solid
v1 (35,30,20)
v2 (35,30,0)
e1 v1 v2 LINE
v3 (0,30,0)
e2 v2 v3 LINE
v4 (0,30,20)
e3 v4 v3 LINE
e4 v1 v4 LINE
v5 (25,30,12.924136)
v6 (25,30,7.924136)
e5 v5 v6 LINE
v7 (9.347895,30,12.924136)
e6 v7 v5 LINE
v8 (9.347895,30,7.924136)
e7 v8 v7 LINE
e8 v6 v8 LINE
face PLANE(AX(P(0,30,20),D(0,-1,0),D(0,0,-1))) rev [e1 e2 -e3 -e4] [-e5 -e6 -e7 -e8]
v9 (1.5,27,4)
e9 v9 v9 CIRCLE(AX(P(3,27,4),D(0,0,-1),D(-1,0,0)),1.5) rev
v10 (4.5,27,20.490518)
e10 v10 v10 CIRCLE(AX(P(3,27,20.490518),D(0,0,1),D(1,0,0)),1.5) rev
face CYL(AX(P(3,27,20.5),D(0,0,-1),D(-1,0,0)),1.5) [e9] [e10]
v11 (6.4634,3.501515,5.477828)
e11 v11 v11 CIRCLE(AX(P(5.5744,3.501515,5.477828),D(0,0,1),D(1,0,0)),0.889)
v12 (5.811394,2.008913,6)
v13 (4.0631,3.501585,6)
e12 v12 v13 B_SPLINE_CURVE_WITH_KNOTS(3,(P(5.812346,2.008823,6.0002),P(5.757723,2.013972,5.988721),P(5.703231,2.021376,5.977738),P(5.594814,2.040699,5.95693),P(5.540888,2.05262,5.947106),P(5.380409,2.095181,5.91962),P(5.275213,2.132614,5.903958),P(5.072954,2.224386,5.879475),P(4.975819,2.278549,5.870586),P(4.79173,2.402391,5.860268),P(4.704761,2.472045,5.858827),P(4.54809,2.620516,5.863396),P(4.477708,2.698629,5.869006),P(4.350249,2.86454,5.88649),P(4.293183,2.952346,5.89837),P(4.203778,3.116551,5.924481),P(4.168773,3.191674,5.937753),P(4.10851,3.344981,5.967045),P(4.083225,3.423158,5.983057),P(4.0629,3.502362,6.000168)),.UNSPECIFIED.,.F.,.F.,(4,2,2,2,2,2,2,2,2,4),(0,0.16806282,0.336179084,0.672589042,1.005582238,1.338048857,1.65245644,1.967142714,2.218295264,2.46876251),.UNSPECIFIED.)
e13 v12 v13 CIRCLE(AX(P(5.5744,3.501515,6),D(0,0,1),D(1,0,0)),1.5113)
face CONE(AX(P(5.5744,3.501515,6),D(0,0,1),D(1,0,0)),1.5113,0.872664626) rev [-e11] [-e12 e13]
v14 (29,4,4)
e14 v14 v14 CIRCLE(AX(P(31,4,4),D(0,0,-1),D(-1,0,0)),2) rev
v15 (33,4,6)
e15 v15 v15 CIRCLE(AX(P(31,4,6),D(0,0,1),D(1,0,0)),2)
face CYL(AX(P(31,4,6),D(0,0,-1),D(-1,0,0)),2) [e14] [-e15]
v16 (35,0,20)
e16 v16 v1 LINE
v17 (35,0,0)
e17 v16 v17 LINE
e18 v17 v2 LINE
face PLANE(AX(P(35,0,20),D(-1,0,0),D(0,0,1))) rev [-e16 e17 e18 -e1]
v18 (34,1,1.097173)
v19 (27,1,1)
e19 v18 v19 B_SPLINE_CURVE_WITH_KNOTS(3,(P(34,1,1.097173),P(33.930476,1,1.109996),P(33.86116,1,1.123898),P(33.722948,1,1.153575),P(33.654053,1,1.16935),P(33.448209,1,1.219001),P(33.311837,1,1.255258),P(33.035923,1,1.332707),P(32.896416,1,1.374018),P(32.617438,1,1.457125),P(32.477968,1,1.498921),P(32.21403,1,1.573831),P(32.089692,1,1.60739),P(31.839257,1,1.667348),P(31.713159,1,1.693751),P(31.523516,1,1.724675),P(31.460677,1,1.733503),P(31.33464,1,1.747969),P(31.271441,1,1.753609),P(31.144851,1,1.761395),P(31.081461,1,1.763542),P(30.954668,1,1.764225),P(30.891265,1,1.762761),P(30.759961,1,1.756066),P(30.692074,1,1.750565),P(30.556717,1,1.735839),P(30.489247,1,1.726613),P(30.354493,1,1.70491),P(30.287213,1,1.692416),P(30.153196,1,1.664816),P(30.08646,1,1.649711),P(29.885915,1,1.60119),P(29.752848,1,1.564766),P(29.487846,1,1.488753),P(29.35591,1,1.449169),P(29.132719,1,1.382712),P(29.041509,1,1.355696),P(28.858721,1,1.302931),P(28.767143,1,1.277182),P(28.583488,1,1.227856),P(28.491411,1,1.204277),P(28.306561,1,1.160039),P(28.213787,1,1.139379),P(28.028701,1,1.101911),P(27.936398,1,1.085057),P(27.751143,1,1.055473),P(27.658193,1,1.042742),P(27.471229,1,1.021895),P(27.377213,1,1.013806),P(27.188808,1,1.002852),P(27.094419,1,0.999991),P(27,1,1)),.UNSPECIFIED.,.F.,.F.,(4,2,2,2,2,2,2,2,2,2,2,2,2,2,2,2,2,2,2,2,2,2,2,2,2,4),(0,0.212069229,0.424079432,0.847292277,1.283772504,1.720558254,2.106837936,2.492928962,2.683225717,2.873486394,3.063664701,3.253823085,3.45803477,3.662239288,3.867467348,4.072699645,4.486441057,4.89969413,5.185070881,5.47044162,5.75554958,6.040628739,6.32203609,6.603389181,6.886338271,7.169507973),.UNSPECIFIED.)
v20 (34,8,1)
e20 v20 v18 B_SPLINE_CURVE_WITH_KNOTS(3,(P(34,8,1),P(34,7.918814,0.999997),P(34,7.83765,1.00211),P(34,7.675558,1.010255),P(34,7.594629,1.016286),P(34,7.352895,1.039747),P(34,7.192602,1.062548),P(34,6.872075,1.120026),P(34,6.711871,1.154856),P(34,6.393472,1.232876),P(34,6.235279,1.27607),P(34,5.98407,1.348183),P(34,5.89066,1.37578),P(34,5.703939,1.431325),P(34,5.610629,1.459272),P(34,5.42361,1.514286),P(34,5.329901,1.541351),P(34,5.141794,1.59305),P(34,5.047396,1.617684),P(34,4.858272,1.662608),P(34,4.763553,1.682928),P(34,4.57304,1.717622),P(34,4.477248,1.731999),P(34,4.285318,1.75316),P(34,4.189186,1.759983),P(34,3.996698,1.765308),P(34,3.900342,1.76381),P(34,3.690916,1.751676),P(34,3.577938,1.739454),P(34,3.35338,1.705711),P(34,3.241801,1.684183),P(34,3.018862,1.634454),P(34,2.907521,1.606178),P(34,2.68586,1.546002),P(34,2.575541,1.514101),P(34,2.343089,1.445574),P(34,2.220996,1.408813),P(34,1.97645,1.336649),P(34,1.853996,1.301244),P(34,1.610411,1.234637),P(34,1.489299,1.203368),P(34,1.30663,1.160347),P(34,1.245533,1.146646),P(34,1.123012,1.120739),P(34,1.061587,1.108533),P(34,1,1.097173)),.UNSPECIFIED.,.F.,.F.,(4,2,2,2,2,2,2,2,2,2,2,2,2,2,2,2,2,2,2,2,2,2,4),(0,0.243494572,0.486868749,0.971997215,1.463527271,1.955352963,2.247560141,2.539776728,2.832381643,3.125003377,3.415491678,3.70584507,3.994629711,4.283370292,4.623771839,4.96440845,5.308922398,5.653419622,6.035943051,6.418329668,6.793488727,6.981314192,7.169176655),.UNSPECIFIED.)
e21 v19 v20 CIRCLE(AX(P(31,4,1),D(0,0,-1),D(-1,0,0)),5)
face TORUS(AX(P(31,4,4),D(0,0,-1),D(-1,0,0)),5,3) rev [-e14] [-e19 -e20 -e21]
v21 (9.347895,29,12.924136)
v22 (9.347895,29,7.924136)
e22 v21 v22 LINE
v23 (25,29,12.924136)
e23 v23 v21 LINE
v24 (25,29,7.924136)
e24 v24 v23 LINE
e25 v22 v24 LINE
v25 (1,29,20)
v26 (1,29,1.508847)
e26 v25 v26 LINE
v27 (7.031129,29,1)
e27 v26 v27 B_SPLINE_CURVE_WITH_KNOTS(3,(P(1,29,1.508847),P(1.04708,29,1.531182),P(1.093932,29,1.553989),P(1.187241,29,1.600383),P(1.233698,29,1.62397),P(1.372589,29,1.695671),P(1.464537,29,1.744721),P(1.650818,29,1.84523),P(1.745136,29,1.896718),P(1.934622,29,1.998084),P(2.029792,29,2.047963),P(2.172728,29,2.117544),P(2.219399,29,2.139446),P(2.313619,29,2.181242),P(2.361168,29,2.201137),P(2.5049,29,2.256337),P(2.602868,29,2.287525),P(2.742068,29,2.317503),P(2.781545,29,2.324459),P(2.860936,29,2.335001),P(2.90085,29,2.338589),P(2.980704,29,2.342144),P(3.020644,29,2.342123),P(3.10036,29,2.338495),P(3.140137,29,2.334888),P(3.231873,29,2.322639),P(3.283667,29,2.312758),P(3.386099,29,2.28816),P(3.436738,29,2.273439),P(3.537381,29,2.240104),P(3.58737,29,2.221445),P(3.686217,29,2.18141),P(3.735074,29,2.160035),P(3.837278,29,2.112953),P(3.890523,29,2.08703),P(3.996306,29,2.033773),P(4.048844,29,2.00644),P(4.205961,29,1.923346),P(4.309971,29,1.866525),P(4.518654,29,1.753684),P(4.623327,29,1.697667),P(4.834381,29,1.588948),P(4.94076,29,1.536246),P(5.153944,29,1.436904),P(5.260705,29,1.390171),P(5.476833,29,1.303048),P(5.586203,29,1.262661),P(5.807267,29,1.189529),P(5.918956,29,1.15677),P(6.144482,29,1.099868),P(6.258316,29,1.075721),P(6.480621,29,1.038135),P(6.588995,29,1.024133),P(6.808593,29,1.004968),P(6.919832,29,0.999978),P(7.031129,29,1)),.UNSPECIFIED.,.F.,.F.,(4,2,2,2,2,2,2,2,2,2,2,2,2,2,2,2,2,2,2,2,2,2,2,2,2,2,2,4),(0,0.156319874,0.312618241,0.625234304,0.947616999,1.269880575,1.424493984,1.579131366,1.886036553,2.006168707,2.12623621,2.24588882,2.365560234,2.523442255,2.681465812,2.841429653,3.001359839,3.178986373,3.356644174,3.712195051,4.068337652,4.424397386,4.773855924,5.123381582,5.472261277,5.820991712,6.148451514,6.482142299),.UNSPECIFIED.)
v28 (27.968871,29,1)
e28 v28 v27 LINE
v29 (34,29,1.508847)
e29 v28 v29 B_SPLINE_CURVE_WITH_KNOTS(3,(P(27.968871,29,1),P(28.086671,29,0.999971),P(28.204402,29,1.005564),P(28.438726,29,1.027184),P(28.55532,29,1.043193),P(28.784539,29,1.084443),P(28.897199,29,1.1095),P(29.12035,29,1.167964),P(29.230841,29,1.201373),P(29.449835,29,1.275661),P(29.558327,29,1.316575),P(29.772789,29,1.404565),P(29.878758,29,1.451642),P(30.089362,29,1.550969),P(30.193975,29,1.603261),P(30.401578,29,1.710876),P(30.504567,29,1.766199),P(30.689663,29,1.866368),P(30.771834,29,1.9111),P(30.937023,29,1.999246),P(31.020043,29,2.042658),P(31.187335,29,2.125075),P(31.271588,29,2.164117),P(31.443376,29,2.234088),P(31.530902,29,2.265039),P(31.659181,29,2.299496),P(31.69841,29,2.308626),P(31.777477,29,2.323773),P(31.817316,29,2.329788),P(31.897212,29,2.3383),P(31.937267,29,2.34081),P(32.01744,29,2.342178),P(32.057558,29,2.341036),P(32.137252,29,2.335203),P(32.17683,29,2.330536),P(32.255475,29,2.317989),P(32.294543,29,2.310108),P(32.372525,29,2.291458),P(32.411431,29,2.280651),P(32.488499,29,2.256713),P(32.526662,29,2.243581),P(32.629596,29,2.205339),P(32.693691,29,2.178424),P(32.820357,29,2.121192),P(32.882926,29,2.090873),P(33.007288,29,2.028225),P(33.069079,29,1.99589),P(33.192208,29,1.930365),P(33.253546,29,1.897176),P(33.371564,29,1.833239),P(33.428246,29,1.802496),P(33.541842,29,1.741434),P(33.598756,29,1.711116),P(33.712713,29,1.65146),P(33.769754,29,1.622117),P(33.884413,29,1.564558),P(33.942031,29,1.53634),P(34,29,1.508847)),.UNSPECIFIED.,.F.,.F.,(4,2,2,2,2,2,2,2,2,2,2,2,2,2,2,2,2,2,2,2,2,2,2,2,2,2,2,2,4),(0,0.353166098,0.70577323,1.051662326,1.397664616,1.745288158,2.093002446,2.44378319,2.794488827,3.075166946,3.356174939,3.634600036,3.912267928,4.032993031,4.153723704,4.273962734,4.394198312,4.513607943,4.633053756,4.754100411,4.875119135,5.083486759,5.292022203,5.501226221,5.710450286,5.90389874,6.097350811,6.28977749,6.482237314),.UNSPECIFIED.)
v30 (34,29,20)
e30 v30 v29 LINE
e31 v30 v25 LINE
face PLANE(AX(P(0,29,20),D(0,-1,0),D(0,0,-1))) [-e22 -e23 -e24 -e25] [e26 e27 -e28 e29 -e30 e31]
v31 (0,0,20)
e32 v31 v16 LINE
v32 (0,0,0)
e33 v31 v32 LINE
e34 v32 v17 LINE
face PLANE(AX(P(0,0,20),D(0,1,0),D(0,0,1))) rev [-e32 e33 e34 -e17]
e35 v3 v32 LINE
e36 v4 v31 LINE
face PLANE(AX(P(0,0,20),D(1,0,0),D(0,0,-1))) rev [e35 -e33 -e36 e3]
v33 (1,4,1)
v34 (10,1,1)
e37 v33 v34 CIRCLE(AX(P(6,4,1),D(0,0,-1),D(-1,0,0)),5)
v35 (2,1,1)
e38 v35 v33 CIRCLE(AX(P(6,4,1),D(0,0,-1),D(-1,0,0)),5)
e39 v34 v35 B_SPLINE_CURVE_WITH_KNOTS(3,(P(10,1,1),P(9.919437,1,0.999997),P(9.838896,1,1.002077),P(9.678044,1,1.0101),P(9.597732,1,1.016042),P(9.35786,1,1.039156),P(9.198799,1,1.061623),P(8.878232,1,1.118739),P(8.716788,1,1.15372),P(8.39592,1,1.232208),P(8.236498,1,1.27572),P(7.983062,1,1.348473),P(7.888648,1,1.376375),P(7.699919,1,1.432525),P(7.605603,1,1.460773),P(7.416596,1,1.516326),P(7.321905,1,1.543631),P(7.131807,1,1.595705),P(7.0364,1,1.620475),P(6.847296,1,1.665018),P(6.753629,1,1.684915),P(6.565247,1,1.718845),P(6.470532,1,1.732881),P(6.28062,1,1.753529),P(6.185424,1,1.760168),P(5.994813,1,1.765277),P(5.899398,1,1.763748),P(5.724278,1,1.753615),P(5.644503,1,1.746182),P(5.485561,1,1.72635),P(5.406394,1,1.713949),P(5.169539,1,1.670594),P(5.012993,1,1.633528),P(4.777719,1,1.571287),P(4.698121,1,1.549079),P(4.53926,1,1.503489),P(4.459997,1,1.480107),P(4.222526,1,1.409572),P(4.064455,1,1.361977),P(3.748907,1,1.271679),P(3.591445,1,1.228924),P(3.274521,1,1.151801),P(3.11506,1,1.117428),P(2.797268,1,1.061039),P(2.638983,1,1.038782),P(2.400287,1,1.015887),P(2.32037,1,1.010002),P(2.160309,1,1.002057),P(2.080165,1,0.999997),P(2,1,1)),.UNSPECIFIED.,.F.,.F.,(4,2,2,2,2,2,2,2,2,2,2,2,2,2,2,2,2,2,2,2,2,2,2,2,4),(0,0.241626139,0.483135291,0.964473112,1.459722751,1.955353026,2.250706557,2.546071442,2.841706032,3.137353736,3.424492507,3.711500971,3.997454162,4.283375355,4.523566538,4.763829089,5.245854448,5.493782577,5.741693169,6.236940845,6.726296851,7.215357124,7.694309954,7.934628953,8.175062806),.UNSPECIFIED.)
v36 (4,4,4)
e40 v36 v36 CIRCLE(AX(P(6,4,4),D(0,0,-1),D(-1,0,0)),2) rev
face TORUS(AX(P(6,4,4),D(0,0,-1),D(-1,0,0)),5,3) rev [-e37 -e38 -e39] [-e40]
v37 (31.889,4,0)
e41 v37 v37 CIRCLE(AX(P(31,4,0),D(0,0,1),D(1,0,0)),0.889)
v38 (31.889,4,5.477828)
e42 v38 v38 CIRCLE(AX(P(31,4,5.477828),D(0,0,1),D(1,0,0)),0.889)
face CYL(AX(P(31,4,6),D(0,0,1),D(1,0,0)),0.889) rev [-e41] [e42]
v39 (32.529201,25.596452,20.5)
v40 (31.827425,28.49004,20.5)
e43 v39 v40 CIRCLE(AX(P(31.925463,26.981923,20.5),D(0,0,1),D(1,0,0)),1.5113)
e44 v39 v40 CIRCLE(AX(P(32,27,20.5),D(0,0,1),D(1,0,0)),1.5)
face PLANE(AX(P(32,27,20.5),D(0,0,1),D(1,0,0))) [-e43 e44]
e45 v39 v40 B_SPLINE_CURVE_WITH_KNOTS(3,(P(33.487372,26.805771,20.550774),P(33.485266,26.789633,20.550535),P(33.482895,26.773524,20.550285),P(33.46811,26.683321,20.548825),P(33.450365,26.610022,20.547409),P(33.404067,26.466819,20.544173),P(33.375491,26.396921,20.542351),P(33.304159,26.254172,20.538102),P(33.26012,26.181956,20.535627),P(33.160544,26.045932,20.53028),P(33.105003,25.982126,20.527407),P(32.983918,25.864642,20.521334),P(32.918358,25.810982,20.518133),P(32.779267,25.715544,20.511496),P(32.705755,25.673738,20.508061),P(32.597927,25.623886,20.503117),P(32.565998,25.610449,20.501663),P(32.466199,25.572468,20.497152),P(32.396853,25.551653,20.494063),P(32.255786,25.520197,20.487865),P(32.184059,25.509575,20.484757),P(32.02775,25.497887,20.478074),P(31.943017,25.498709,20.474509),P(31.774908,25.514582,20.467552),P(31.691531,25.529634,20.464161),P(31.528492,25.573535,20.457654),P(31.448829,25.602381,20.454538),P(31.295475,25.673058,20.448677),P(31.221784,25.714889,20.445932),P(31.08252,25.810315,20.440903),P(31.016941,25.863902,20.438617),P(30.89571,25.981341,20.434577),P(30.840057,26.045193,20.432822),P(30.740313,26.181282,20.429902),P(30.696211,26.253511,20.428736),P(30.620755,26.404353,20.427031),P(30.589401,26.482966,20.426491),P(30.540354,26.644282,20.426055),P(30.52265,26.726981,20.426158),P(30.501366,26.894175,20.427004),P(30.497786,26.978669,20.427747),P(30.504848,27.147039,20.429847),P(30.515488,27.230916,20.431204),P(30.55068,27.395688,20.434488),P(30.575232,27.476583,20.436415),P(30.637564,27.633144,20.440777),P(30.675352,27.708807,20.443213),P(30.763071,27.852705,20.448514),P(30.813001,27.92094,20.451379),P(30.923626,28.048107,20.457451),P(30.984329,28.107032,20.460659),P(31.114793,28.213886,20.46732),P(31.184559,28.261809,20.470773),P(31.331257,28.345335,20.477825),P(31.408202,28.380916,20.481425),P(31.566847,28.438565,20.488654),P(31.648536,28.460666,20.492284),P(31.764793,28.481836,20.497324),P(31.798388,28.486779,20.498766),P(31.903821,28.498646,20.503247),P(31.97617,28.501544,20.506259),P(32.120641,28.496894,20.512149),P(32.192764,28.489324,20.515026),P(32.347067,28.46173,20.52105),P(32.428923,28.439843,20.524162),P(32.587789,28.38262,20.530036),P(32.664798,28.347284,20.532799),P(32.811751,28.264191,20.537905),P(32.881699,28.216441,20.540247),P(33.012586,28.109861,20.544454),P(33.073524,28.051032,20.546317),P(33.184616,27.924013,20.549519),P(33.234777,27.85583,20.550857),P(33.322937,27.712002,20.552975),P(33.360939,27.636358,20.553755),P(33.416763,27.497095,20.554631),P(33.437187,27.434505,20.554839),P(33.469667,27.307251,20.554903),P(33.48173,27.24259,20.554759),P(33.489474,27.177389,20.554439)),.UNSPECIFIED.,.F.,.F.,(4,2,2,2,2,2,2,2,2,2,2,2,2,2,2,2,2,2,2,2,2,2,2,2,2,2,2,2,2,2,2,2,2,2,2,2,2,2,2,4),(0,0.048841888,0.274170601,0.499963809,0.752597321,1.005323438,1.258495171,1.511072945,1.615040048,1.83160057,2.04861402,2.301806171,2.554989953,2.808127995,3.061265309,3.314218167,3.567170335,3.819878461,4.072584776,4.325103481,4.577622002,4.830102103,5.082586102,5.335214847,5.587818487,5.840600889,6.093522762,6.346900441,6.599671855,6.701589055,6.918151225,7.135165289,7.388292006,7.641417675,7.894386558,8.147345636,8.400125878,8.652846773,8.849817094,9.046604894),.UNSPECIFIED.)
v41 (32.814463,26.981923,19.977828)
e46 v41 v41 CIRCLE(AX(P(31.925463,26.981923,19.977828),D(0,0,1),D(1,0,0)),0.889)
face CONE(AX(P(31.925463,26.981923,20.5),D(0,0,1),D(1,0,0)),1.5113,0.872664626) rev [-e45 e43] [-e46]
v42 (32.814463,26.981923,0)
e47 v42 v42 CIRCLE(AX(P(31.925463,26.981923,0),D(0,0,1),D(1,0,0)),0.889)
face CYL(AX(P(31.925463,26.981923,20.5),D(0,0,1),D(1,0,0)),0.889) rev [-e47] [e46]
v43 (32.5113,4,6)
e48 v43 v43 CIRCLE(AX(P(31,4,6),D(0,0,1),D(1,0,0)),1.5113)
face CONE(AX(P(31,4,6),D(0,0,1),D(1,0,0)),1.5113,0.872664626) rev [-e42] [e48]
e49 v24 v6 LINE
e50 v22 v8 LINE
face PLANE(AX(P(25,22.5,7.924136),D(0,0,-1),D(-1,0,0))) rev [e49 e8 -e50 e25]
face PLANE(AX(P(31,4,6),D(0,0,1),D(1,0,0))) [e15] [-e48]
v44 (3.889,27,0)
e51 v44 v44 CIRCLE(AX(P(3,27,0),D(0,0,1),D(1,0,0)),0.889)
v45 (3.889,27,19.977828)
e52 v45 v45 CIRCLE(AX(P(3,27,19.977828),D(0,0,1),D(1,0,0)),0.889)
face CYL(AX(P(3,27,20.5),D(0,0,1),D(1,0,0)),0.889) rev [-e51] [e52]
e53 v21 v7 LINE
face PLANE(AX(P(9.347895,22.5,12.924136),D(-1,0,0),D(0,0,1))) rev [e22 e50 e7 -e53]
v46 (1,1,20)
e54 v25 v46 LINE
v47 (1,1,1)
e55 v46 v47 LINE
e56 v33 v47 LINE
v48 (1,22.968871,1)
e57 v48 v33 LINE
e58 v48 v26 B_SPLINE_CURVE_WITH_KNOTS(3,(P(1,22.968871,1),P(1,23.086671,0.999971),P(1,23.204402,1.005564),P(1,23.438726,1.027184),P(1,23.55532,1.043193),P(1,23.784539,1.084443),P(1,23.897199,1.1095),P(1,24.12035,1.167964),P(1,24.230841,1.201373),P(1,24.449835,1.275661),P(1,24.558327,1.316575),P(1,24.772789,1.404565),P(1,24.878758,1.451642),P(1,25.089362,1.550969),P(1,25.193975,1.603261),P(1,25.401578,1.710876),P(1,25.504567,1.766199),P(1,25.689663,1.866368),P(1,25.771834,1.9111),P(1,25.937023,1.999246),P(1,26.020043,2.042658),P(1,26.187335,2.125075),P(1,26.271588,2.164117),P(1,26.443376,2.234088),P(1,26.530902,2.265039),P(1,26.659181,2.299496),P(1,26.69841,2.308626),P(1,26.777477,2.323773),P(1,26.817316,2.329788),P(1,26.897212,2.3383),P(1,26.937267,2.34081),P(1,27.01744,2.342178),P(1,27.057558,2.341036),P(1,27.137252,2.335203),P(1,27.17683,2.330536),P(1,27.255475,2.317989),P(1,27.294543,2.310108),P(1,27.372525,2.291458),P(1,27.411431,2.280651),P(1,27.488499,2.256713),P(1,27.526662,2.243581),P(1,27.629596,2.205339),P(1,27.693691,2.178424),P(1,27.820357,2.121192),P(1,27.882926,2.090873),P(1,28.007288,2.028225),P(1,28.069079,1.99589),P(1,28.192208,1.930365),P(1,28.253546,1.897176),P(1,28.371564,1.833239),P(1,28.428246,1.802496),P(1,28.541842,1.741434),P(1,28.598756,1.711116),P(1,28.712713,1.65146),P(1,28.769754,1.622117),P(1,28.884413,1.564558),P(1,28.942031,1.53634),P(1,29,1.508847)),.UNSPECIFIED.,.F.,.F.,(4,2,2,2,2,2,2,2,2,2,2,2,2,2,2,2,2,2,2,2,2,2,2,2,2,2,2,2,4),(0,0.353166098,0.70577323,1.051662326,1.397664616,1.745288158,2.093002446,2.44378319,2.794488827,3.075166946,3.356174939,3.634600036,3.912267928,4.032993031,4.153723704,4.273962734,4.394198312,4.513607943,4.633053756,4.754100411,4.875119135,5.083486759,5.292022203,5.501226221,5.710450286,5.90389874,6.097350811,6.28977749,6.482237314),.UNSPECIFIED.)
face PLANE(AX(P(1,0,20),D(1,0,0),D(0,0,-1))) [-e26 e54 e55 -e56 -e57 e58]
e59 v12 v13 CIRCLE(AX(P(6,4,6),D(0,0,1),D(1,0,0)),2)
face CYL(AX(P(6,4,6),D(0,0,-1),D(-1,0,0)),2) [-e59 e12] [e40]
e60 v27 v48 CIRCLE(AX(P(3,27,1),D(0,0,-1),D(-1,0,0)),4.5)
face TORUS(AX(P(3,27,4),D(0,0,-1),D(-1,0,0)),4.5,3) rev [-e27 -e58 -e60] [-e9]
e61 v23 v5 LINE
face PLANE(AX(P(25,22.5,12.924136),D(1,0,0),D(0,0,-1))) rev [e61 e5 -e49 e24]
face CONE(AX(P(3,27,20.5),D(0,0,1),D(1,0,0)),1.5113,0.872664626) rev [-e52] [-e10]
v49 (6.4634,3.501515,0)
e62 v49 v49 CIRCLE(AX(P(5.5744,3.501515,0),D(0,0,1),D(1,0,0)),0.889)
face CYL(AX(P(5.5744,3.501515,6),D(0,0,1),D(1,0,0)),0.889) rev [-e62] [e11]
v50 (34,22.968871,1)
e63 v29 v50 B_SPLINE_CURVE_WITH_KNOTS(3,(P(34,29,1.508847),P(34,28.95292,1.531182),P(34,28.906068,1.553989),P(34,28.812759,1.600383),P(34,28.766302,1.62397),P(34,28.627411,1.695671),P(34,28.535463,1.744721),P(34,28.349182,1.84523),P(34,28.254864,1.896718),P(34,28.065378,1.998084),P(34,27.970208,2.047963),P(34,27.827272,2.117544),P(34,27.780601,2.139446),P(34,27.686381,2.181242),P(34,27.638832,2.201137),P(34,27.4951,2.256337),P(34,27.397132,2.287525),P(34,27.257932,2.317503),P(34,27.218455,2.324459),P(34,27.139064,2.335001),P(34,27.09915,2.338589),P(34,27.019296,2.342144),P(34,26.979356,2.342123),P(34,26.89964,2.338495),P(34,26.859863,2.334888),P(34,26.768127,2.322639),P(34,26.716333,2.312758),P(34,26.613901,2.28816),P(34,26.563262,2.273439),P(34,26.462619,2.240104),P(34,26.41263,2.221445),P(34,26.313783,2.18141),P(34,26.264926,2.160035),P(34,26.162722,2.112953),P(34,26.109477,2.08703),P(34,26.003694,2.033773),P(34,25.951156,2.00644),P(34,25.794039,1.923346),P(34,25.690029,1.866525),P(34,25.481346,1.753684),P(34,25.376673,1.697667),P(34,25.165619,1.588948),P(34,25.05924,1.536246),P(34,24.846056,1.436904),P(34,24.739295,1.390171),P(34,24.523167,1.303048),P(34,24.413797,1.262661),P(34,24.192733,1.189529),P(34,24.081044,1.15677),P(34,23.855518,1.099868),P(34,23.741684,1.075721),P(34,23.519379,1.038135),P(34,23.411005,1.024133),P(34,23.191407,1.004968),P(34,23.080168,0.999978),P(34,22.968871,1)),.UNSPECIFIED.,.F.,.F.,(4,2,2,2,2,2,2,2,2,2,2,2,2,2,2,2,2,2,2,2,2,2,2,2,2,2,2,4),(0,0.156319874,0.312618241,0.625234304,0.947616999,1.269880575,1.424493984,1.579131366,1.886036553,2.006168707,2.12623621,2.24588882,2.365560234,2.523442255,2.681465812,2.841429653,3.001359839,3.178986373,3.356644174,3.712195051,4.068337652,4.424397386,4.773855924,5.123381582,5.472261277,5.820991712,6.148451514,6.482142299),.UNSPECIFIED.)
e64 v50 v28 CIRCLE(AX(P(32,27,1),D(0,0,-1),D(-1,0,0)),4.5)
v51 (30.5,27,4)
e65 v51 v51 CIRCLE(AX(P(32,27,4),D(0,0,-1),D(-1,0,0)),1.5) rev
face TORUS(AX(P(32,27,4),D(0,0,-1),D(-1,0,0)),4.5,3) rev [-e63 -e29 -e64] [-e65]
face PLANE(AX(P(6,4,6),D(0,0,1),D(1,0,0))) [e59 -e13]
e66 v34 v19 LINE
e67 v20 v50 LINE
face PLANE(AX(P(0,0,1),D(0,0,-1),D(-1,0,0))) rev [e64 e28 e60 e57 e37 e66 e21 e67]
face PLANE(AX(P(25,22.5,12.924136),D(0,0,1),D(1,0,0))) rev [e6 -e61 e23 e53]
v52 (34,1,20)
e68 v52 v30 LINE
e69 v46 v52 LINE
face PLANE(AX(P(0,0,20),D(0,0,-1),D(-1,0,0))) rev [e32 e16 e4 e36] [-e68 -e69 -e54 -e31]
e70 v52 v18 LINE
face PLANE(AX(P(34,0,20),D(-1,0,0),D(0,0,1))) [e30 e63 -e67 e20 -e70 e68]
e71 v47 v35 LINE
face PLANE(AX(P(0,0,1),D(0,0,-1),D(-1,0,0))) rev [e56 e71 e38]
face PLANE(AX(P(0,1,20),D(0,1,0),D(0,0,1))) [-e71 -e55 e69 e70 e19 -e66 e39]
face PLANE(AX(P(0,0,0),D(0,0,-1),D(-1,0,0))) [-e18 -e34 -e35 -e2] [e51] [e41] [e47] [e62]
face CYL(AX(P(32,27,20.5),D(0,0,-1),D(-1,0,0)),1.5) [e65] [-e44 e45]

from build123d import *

# Parameters (mm, degrees)
SKETCH1_W                                         = 35
SKETCH1_H                                         = 30
BOSS_EXTRUDE1_DEPTH                               = 20
SHELL1_T                                          = -1
SKETCH6_R                                         = 2
BOSS_EXTRUDE5_DEPTH                               = 5
CSK_FOR_0_FLAT_HEAD_MACHINE_SCREW_100_D           = 1.778
CSK_FOR_0_FLAT_HEAD_MACHINE_SCREW_100_CSINK_D     = 3.0226
CSK_FOR_0_FLAT_HEAD_MACHINE_SCREW_100_CSINK_ANGLE = 100
SKETCH11_R                                        = 1.5
BOSS_EXTRUDE6_DEPTH                               = 19.5
CSK_FOR_0_FLAT_HEAD_MACHINE_SCREW_2_D             = 1.778
CSK_FOR_0_FLAT_HEAD_MACHINE_SCREW_2_CSINK_D       = 3.0226
CSK_FOR_0_FLAT_HEAD_MACHINE_SCREW_2_CSINK_ANGLE   = 100
SKETCH16_W                                        = 15.652105204
SKETCH16_H                                        = 5
CUT_EXTRUDE1_DEPTH                                = 7.5
FILLET1_R                                         = 3
FILLET2_R                                         = 3


with BuildPart() as part:
    # Sketch1 → Boss-Extrude1 (new body)
    with BuildSketch(Plane.XY):
        with Locations((17.5, 15)):
            Rectangle(SKETCH1_W, SKETCH1_H)
    extrude(amount=BOSS_EXTRUDE1_DEPTH)

    # Shell1
    shell1_openings = [part.faces().sort_by_distance(p)[0] for p in [
        (17.5, 15, 20),
    ]]
    offset(amount=SHELL1_T, openings=shell1_openings, kind=Kind.INTERSECTION)

    # Sketch6 → Boss-Extrude5 (add)
    with BuildSketch(Plane.XY.offset(1)):
        with Locations(Location((31, 4, 0), (0, 0, 180))):
            Circle(SKETCH6_R)
        with Locations(Location((6, 4, 0), (0, 0, 180))):
            Circle(SKETCH6_R)
    extrude(amount=BOSS_EXTRUDE5_DEPTH)

    # CSK for _0 Flat Head Machine Screw _100 (through all)
    with Locations(Plane.XY.offset(6)):
        with Locations((5.574399883, 3.50151513), (31, 4)):
            CounterSinkHole(CSK_FOR_0_FLAT_HEAD_MACHINE_SCREW_100_D / 2, CSK_FOR_0_FLAT_HEAD_MACHINE_SCREW_100_CSINK_D / 2, counter_sink_angle=CSK_FOR_0_FLAT_HEAD_MACHINE_SCREW_100_CSINK_ANGLE)

    # Sketch11 → Boss-Extrude6 (add)
    with BuildSketch(Plane.XY.offset(1)):
        with Locations(Location((3, 27, 0), (0, 0, 180))):
            Circle(SKETCH11_R)
        with Locations(Location((32, 27, 0), (0, 0, 180))):
            Circle(SKETCH11_R)
    extrude(amount=BOSS_EXTRUDE6_DEPTH)

    # CSK for _0 Flat Head Machine Screw _ 2 (through all)
    with Locations(Plane.XY.offset(20.5)):
        with Locations((31.925463408, 26.981922801), (3, 27)):
            CounterSinkHole(CSK_FOR_0_FLAT_HEAD_MACHINE_SCREW_2_D / 2, CSK_FOR_0_FLAT_HEAD_MACHINE_SCREW_2_CSINK_D / 2, counter_sink_angle=CSK_FOR_0_FLAT_HEAD_MACHINE_SCREW_2_CSINK_ANGLE)

    # Sketch16 → Cut-Extrude1 (cut)
    with BuildSketch(Plane(origin=(0, 30, 0), x_dir=(1, 0, 0), z_dir=(0, 1, 0))):
        with Locations((17.173947398, -10.424136078)):
            Rectangle(SKETCH16_W, SKETCH16_H)
    extrude(amount=-CUT_EXTRUDE1_DEPTH, mode=Mode.SUBTRACT)

    # Fillet1
    # the kernel refuses this fillet: 3 mm, written as the material it adds along each edge
    with BuildSketch(Plane(origin=(3, 27, 1), x_dir=(-1, 0, 0), z_dir=(0, 1, 0))) as fillet1_piece_1_section:
        with BuildLine():
            CenterArc((1.5 + FILLET1_R, FILLET1_R), FILLET1_R, 180, 90)
            Line((1.5, FILLET1_R), (1.5, 0))
            Line((1.5, 0), (1.5 + FILLET1_R, 0))
        make_face()
    fillet1_piece_1 = revolve(axis=Axis((3, 27, 1), (0, 0, 1)), mode=Mode.PRIVATE)
    fillet1_piece_1 = split(fillet1_piece_1, bisect_by=Plane(origin=(1, 27, 1.859549256), z_dir=(1, 0, 0)), keep=Keep.TOP, mode=Mode.PRIVATE)
    fillet1_piece_1 = split(fillet1_piece_1, bisect_by=Plane(origin=(5.359549256, 29, 1.859549256), z_dir=(0, -1, 0)), keep=Keep.TOP, mode=Mode.PRIVATE)
    add(fillet1_piece_1)
    with BuildSketch(Plane(origin=(32, 27, 1), x_dir=(-1, 0, 0), z_dir=(0, 1, 0))) as fillet1_piece_2_section:
        with BuildLine():
            CenterArc((1.5 + FILLET1_R, FILLET1_R), FILLET1_R, 180, 90)
            Line((1.5, FILLET1_R), (1.5, 0))
            Line((1.5, 0), (1.5 + FILLET1_R, 0))
        make_face()
    fillet1_piece_2 = revolve(axis=Axis((32, 27, 1), (0, 0, 1)), mode=Mode.PRIVATE)
    fillet1_piece_2 = split(fillet1_piece_2, bisect_by=Plane(origin=(30.141729678, 29, 1.076089877), z_dir=(0, -1, 0)), keep=Keep.TOP, mode=Mode.PRIVATE)
    fillet1_piece_2 = split(fillet1_piece_2, bisect_by=Plane(origin=(34, 23.781381388, 1.076089877), z_dir=(-1, 0, 0)), keep=Keep.TOP, mode=Mode.PRIVATE)
    add(fillet1_piece_2)

    # Fillet2
    # the kernel refuses this fillet: 3 mm, written as the material it adds along each edge
    with BuildSketch(Plane(origin=(31, 4, 1), x_dir=(-1, 0, 0), z_dir=(0, 1, 0))) as fillet2_piece_1_section:
        with BuildLine():
            CenterArc((2 + FILLET2_R, FILLET2_R), FILLET2_R, 180, 90)
            Line((2, FILLET2_R), (2, 0))
            Line((2, 0), (2 + FILLET2_R, 0))
        make_face()
    fillet2_piece_1 = revolve(axis=Axis((31, 4, 1), (0, 0, 1)), mode=Mode.PRIVATE)
    fillet2_piece_1 = split(fillet2_piece_1, bisect_by=Plane(origin=(33.856939256, 0, 1.856939256), z_dir=(0, 1, 0)), keep=Keep.TOP, mode=Mode.PRIVATE)
    fillet2_piece_1 = split(fillet2_piece_1, bisect_by=Plane(origin=(35, 4, 1.856939256), z_dir=(-1, 0, 0)), keep=Keep.TOP, mode=Mode.PRIVATE)
    add(fillet2_piece_1)
    with BuildSketch(Plane(origin=(6, 4, 1), x_dir=(-1, 0, 0), z_dir=(0, 1, 0))) as fillet2_piece_2_section:
        with BuildLine():
            CenterArc((2 + FILLET2_R, FILLET2_R), FILLET2_R, 180, 90)
            Line((2, FILLET2_R), (2, 0))
            Line((2, 0), (2 + FILLET2_R, 0))
        make_face()
    fillet2_piece_2 = revolve(axis=Axis((6, 4, 1), (0, 0, 1)), mode=Mode.PRIVATE)
    fillet2_piece_2 = split(fillet2_piece_2, bisect_by=Plane(origin=(8.856531723, 0, 1.856531723), z_dir=(0, 1, 0)), keep=Keep.TOP, mode=Mode.PRIVATE)
    add(fillet2_piece_2)


solid = part.part
